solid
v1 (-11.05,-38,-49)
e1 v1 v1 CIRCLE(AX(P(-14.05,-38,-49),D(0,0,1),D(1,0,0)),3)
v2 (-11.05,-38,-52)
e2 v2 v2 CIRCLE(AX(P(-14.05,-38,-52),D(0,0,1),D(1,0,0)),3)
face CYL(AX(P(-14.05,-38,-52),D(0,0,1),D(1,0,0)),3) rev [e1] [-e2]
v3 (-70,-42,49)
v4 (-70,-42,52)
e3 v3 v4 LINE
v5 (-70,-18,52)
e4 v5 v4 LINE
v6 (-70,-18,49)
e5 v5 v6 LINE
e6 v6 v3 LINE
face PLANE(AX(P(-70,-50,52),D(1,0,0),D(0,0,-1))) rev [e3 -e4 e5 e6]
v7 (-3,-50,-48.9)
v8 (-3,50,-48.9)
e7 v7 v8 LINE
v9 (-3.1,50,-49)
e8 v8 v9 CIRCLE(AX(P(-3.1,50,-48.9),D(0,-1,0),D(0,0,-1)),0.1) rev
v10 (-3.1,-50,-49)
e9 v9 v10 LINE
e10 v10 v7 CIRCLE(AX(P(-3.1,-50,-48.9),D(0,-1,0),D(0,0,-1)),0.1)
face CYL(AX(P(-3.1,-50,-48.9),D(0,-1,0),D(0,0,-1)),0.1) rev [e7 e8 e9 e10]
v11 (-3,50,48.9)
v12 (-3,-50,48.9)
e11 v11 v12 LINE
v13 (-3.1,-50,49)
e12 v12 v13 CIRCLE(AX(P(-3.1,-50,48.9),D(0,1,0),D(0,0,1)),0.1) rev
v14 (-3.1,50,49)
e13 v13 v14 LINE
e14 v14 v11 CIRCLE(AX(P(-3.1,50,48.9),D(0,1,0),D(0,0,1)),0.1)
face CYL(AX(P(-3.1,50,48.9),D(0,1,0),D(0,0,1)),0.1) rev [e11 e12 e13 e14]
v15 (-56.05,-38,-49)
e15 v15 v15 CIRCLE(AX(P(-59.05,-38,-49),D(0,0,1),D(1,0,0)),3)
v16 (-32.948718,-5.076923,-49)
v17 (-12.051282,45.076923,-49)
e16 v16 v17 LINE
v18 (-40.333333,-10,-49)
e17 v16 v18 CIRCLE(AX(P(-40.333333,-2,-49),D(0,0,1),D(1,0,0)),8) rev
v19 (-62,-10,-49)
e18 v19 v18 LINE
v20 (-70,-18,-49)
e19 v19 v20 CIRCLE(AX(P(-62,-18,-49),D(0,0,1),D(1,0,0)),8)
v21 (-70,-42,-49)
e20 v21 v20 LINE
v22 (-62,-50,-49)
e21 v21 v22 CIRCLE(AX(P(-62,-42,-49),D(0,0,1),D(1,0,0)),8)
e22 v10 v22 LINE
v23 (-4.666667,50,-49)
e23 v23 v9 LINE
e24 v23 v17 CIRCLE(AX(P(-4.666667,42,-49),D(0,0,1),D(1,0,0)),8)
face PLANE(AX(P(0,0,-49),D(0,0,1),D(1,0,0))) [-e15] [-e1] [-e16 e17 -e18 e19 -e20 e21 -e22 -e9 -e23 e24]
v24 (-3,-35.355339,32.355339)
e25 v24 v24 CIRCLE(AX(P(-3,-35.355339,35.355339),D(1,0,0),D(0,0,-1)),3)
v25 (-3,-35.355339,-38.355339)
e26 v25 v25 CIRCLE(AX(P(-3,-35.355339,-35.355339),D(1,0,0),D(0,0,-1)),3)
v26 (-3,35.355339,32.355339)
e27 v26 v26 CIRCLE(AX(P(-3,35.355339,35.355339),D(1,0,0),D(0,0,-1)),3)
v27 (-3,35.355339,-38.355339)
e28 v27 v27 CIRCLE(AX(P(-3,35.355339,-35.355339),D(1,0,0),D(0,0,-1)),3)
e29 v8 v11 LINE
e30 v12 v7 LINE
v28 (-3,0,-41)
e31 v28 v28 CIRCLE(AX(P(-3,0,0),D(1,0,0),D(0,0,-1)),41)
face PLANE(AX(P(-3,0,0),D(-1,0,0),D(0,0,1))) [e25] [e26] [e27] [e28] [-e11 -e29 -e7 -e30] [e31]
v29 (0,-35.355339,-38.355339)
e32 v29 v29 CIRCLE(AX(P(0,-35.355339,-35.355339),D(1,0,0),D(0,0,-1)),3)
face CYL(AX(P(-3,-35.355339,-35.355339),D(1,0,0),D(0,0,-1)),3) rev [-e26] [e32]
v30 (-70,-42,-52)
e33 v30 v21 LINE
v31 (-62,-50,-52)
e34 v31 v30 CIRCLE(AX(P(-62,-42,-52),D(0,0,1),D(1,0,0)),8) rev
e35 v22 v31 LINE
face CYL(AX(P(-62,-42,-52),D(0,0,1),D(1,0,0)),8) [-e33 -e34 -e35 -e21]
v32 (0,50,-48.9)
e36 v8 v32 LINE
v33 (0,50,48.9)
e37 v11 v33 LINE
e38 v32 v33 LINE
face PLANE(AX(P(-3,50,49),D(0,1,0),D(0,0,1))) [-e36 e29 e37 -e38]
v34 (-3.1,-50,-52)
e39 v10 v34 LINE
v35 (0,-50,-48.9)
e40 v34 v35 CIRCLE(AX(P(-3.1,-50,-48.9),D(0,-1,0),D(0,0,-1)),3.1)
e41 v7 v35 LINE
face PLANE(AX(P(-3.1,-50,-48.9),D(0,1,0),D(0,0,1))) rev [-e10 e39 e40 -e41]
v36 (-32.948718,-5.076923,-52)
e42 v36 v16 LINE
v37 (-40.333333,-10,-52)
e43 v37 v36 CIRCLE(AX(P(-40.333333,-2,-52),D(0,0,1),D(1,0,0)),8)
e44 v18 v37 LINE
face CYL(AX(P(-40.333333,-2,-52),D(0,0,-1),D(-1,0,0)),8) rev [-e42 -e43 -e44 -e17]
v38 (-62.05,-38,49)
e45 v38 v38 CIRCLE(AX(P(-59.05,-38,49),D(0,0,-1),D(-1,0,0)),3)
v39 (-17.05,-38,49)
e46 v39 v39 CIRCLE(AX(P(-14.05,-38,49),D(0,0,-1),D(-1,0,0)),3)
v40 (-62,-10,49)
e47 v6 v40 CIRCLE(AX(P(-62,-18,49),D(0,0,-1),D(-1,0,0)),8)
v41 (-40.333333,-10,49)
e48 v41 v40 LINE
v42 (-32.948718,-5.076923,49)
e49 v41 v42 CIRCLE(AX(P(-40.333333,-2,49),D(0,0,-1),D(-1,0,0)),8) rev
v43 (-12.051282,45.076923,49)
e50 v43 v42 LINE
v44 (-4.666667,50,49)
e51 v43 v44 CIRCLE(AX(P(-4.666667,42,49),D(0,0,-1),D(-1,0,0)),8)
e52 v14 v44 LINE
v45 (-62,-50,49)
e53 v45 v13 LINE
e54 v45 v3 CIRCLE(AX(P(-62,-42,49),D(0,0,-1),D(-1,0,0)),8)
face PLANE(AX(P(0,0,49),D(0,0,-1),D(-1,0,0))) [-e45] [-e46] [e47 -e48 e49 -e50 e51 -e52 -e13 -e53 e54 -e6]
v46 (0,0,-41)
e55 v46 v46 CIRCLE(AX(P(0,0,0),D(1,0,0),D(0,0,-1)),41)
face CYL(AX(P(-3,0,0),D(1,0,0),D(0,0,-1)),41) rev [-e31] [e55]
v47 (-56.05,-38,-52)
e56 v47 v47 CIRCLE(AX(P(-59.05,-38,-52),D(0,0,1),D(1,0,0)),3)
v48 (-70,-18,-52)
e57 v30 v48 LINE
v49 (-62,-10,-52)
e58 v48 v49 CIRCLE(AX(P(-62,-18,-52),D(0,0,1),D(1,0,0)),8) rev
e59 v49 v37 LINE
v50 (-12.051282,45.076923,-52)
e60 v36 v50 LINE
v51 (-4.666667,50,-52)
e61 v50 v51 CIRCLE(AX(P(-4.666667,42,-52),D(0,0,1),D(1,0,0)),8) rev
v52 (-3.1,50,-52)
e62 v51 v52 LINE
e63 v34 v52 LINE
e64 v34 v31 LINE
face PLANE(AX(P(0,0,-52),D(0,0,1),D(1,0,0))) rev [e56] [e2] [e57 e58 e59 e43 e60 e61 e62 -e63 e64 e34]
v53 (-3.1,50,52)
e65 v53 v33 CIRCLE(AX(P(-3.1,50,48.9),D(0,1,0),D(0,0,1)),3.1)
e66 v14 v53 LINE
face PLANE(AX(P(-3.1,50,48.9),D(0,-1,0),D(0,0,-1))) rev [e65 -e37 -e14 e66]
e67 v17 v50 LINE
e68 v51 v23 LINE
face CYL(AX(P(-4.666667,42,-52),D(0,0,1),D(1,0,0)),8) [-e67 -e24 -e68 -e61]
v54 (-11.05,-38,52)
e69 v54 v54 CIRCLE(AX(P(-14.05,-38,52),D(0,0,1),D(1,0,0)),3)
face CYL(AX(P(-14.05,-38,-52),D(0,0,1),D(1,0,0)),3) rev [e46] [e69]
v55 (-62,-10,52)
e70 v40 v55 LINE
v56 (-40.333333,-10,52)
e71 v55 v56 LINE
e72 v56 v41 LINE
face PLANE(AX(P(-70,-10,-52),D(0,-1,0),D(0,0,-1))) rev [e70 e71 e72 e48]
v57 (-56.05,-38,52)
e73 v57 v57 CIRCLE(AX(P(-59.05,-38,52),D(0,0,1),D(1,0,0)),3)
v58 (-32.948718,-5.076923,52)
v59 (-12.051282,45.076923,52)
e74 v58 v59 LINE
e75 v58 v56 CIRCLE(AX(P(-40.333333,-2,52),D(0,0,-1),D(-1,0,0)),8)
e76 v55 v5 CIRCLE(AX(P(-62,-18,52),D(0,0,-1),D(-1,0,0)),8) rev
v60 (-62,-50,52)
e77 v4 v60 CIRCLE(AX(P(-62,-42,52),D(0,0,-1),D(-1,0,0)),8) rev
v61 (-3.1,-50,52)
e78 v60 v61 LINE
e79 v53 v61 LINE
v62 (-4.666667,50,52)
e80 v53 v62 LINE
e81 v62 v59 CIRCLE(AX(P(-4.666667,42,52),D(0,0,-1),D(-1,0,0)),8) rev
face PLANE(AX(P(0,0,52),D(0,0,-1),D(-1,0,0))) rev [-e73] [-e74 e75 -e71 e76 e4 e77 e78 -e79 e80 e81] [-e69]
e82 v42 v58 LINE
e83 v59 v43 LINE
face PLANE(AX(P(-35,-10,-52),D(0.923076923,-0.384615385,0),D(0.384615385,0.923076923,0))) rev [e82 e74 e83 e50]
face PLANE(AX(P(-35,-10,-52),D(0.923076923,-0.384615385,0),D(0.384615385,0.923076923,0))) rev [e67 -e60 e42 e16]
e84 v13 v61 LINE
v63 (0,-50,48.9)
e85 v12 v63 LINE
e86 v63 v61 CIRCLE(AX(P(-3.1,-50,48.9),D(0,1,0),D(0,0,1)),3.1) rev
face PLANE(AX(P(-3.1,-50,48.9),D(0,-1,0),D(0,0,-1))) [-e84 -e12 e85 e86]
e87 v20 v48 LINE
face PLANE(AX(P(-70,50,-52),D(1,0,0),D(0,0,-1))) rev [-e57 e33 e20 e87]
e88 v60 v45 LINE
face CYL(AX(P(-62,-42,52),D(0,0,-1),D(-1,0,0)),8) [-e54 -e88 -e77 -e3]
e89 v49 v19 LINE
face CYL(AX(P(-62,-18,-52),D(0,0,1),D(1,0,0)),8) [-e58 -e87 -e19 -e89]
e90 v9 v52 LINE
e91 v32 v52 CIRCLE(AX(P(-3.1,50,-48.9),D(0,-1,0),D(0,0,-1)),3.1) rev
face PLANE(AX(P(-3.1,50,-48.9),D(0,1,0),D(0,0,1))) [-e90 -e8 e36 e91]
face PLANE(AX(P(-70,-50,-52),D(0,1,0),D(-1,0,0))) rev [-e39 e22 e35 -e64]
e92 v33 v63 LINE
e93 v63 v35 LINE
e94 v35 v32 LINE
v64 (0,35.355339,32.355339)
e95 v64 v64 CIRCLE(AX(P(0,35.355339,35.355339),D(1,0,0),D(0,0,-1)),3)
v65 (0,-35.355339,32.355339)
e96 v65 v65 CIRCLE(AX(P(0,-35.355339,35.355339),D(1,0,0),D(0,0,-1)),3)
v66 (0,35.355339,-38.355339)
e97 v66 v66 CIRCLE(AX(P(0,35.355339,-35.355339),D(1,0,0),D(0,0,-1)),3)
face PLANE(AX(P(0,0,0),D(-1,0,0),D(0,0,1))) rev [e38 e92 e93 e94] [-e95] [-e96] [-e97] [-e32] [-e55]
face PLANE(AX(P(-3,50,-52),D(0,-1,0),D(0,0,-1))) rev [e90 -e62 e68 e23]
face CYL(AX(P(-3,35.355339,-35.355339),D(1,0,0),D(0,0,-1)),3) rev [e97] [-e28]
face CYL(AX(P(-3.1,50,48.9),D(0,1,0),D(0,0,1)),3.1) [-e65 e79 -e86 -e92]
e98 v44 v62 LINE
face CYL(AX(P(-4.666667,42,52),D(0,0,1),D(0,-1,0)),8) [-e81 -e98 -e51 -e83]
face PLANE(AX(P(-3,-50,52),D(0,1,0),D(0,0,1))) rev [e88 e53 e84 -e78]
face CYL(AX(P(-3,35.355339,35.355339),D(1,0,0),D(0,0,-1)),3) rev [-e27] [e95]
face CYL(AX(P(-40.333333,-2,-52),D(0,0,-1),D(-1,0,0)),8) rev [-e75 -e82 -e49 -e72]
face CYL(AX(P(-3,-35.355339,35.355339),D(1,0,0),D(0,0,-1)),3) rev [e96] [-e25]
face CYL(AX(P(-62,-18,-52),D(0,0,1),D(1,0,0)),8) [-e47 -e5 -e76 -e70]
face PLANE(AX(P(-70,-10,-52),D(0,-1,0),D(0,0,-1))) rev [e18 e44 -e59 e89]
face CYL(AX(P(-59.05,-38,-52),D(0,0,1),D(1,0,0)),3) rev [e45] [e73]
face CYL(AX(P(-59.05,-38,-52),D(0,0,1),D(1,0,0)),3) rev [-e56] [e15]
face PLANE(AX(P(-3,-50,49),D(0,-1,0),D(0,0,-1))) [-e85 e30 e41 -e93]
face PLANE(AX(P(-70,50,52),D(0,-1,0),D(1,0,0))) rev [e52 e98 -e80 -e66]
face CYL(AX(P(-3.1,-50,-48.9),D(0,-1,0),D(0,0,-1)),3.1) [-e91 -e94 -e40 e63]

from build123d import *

# Parameters (mm, degrees)
SKETCH_1_W                         = 98
SKETCH_1_H                         = 100
SKETCH_1_R                         = 41
SKETCH_1_R_2                       = 3
SM_BASE_FLANGE_1_DEPTH             = 3
SM_EDGE_FLANGE_1_STRIP_W           = 12.2
SM_EDGE_FLANGE_1_STRIP_H           = 3
SM_EDGE_FLANGE_1_STRIP_CUT_DEPTH   = 100
SM_EDGE_FLANGE_1_STRIP_2_W         = 12.2
SM_EDGE_FLANGE_1_STRIP_2_H         = 3
SM_EDGE_FLANGE_1_STRIP_CUT_2_DEPTH = 100
SM_EDGE_FLANGE_1_DEPTH             = 100
SM_EDGE_FLANGE_1_BEND_DEPTH        = 100
SKETCH_8_R                         = 3
CUT_EXTRUDE_1_DEPTH                = 135.96666255
FILLET_1_R                         = 8


# Sheet-metal steps are written as plain solids
with BuildPart() as part:
    # Sketch 1 → 基体-法兰1 (new body)
    with BuildSketch(Plane(origin=(0, 0, 0), x_dir=(0, 0, -1), z_dir=(1, 0, 0))):
        Rectangle(SKETCH_1_W, SKETCH_1_H)
        Circle(SKETCH_1_R, mode=Mode.SUBTRACT)
        with Locations((-35.355339059, 35.355339059)):
            Circle(SKETCH_1_R_2, mode=Mode.SUBTRACT)
        with Locations((35.355339059, 35.355339059)):
            Circle(SKETCH_1_R_2, mode=Mode.SUBTRACT)
        with Locations((35.355339059, -35.355339059)):
            Circle(SKETCH_1_R_2, mode=Mode.SUBTRACT)
        with Locations((-35.355339059, -35.355339059)):
            Circle(SKETCH_1_R_2, mode=Mode.SUBTRACT)
    extrude(amount=-SM_BASE_FLANGE_1_DEPTH)

    # 边线-法兰1 strip (across the edge) → 边线-法兰1 strip cut (cut)
    with BuildSketch(Plane(origin=(-3, -50, 49), x_dir=(0, 0, -1), z_dir=(0, 1, 0))):
        with Locations((-6, -1.5)):
            Rectangle(SM_EDGE_FLANGE_1_STRIP_W, SM_EDGE_FLANGE_1_STRIP_H)
    extrude(amount=SM_EDGE_FLANGE_1_STRIP_CUT_DEPTH, mode=Mode.SUBTRACT)

    # 边线-法兰1 strip 2 (across the edge) → 边线-法兰1 strip cut 2 (cut)
    with BuildSketch(Plane(origin=(-3, 50, -49), x_dir=(0, 0, 1), z_dir=(0, -1, 0))):
        with Locations((-6, -1.5)):
            Rectangle(SM_EDGE_FLANGE_1_STRIP_2_W, SM_EDGE_FLANGE_1_STRIP_2_H)
    extrude(amount=SM_EDGE_FLANGE_1_STRIP_CUT_2_DEPTH, mode=Mode.SUBTRACT)

    # 边线-法兰1 section (across the edge) → 边线-法兰1 (add)
    with BuildSketch(Plane(origin=(-3, -50, 49), x_dir=(0, 0, -1), z_dir=(0, 1, 0))):
        with BuildLine():
            Line((-3, 0.1), (-3, 67))
            Line((-3, 67), (0, 67))
            Line((0, 67), (0, 0.1))
            ThreePointArc((0, 0.1), (0.029289322, 0.029289322), (0.1, 0))
            Line((0.1, 0), (0.1, -3))
            ThreePointArc((0.1, -3), (-2.092031022, -2.092031022), (-3, 0.1))
        make_face()
    extrude(amount=SM_EDGE_FLANGE_1_DEPTH)

    # 边线-法兰1 section 2 (across the edge) → 边线-法兰1 bend (add)
    with BuildSketch(Plane(origin=(-3, 50, -49), x_dir=(0, 0, 1), z_dir=(0, -1, 0))):
        with BuildLine():
            Line((-3, 0.1), (-3, 67))
            Line((-3, 67), (0, 67))
            Line((0, 67), (0, 0.1))
            ThreePointArc((0, 0.1), (0.029289322, 0.029289322), (0.1, 0))
            Line((0.1, 0), (0.1, -3))
            ThreePointArc((0.1, -3), (-2.092031022, -2.092031022), (-3, 0.1))
        make_face()
    extrude(amount=SM_EDGE_FLANGE_1_BEND_DEPTH)

    # 草图8 → 切除-拉伸1 (cut, through all)
    with BuildSketch(Plane.XY.offset(52)):
        with Locations((-14.05, -38)):
            Circle(SKETCH_8_R)
        with Locations((-59.05, -38)):
            Circle(SKETCH_8_R)
        Polygon((-10, 50), (-70, 50), (-70, -10), (-35, -10), align=None)
    extrude(amount=-CUT_EXTRUDE_1_DEPTH, mode=Mode.SUBTRACT)

    # 圆角1
    fillet_1_edges = [part.edges().sort_by_distance(p)[0] for p in [
        (-10, 50, 50.5),
        (-70, -10, 50.5),
        (-35, -10, 50.5),
        (-10, 50, -50.5),
        (-35, -10, -50.5),
        (-70, -10, -50.5),
        (-70, -50, 50.5),
        (-70, -50, -50.5),
    ]]
    fillet(fillet_1_edges, radius=FILLET_1_R)


solid = part.part
